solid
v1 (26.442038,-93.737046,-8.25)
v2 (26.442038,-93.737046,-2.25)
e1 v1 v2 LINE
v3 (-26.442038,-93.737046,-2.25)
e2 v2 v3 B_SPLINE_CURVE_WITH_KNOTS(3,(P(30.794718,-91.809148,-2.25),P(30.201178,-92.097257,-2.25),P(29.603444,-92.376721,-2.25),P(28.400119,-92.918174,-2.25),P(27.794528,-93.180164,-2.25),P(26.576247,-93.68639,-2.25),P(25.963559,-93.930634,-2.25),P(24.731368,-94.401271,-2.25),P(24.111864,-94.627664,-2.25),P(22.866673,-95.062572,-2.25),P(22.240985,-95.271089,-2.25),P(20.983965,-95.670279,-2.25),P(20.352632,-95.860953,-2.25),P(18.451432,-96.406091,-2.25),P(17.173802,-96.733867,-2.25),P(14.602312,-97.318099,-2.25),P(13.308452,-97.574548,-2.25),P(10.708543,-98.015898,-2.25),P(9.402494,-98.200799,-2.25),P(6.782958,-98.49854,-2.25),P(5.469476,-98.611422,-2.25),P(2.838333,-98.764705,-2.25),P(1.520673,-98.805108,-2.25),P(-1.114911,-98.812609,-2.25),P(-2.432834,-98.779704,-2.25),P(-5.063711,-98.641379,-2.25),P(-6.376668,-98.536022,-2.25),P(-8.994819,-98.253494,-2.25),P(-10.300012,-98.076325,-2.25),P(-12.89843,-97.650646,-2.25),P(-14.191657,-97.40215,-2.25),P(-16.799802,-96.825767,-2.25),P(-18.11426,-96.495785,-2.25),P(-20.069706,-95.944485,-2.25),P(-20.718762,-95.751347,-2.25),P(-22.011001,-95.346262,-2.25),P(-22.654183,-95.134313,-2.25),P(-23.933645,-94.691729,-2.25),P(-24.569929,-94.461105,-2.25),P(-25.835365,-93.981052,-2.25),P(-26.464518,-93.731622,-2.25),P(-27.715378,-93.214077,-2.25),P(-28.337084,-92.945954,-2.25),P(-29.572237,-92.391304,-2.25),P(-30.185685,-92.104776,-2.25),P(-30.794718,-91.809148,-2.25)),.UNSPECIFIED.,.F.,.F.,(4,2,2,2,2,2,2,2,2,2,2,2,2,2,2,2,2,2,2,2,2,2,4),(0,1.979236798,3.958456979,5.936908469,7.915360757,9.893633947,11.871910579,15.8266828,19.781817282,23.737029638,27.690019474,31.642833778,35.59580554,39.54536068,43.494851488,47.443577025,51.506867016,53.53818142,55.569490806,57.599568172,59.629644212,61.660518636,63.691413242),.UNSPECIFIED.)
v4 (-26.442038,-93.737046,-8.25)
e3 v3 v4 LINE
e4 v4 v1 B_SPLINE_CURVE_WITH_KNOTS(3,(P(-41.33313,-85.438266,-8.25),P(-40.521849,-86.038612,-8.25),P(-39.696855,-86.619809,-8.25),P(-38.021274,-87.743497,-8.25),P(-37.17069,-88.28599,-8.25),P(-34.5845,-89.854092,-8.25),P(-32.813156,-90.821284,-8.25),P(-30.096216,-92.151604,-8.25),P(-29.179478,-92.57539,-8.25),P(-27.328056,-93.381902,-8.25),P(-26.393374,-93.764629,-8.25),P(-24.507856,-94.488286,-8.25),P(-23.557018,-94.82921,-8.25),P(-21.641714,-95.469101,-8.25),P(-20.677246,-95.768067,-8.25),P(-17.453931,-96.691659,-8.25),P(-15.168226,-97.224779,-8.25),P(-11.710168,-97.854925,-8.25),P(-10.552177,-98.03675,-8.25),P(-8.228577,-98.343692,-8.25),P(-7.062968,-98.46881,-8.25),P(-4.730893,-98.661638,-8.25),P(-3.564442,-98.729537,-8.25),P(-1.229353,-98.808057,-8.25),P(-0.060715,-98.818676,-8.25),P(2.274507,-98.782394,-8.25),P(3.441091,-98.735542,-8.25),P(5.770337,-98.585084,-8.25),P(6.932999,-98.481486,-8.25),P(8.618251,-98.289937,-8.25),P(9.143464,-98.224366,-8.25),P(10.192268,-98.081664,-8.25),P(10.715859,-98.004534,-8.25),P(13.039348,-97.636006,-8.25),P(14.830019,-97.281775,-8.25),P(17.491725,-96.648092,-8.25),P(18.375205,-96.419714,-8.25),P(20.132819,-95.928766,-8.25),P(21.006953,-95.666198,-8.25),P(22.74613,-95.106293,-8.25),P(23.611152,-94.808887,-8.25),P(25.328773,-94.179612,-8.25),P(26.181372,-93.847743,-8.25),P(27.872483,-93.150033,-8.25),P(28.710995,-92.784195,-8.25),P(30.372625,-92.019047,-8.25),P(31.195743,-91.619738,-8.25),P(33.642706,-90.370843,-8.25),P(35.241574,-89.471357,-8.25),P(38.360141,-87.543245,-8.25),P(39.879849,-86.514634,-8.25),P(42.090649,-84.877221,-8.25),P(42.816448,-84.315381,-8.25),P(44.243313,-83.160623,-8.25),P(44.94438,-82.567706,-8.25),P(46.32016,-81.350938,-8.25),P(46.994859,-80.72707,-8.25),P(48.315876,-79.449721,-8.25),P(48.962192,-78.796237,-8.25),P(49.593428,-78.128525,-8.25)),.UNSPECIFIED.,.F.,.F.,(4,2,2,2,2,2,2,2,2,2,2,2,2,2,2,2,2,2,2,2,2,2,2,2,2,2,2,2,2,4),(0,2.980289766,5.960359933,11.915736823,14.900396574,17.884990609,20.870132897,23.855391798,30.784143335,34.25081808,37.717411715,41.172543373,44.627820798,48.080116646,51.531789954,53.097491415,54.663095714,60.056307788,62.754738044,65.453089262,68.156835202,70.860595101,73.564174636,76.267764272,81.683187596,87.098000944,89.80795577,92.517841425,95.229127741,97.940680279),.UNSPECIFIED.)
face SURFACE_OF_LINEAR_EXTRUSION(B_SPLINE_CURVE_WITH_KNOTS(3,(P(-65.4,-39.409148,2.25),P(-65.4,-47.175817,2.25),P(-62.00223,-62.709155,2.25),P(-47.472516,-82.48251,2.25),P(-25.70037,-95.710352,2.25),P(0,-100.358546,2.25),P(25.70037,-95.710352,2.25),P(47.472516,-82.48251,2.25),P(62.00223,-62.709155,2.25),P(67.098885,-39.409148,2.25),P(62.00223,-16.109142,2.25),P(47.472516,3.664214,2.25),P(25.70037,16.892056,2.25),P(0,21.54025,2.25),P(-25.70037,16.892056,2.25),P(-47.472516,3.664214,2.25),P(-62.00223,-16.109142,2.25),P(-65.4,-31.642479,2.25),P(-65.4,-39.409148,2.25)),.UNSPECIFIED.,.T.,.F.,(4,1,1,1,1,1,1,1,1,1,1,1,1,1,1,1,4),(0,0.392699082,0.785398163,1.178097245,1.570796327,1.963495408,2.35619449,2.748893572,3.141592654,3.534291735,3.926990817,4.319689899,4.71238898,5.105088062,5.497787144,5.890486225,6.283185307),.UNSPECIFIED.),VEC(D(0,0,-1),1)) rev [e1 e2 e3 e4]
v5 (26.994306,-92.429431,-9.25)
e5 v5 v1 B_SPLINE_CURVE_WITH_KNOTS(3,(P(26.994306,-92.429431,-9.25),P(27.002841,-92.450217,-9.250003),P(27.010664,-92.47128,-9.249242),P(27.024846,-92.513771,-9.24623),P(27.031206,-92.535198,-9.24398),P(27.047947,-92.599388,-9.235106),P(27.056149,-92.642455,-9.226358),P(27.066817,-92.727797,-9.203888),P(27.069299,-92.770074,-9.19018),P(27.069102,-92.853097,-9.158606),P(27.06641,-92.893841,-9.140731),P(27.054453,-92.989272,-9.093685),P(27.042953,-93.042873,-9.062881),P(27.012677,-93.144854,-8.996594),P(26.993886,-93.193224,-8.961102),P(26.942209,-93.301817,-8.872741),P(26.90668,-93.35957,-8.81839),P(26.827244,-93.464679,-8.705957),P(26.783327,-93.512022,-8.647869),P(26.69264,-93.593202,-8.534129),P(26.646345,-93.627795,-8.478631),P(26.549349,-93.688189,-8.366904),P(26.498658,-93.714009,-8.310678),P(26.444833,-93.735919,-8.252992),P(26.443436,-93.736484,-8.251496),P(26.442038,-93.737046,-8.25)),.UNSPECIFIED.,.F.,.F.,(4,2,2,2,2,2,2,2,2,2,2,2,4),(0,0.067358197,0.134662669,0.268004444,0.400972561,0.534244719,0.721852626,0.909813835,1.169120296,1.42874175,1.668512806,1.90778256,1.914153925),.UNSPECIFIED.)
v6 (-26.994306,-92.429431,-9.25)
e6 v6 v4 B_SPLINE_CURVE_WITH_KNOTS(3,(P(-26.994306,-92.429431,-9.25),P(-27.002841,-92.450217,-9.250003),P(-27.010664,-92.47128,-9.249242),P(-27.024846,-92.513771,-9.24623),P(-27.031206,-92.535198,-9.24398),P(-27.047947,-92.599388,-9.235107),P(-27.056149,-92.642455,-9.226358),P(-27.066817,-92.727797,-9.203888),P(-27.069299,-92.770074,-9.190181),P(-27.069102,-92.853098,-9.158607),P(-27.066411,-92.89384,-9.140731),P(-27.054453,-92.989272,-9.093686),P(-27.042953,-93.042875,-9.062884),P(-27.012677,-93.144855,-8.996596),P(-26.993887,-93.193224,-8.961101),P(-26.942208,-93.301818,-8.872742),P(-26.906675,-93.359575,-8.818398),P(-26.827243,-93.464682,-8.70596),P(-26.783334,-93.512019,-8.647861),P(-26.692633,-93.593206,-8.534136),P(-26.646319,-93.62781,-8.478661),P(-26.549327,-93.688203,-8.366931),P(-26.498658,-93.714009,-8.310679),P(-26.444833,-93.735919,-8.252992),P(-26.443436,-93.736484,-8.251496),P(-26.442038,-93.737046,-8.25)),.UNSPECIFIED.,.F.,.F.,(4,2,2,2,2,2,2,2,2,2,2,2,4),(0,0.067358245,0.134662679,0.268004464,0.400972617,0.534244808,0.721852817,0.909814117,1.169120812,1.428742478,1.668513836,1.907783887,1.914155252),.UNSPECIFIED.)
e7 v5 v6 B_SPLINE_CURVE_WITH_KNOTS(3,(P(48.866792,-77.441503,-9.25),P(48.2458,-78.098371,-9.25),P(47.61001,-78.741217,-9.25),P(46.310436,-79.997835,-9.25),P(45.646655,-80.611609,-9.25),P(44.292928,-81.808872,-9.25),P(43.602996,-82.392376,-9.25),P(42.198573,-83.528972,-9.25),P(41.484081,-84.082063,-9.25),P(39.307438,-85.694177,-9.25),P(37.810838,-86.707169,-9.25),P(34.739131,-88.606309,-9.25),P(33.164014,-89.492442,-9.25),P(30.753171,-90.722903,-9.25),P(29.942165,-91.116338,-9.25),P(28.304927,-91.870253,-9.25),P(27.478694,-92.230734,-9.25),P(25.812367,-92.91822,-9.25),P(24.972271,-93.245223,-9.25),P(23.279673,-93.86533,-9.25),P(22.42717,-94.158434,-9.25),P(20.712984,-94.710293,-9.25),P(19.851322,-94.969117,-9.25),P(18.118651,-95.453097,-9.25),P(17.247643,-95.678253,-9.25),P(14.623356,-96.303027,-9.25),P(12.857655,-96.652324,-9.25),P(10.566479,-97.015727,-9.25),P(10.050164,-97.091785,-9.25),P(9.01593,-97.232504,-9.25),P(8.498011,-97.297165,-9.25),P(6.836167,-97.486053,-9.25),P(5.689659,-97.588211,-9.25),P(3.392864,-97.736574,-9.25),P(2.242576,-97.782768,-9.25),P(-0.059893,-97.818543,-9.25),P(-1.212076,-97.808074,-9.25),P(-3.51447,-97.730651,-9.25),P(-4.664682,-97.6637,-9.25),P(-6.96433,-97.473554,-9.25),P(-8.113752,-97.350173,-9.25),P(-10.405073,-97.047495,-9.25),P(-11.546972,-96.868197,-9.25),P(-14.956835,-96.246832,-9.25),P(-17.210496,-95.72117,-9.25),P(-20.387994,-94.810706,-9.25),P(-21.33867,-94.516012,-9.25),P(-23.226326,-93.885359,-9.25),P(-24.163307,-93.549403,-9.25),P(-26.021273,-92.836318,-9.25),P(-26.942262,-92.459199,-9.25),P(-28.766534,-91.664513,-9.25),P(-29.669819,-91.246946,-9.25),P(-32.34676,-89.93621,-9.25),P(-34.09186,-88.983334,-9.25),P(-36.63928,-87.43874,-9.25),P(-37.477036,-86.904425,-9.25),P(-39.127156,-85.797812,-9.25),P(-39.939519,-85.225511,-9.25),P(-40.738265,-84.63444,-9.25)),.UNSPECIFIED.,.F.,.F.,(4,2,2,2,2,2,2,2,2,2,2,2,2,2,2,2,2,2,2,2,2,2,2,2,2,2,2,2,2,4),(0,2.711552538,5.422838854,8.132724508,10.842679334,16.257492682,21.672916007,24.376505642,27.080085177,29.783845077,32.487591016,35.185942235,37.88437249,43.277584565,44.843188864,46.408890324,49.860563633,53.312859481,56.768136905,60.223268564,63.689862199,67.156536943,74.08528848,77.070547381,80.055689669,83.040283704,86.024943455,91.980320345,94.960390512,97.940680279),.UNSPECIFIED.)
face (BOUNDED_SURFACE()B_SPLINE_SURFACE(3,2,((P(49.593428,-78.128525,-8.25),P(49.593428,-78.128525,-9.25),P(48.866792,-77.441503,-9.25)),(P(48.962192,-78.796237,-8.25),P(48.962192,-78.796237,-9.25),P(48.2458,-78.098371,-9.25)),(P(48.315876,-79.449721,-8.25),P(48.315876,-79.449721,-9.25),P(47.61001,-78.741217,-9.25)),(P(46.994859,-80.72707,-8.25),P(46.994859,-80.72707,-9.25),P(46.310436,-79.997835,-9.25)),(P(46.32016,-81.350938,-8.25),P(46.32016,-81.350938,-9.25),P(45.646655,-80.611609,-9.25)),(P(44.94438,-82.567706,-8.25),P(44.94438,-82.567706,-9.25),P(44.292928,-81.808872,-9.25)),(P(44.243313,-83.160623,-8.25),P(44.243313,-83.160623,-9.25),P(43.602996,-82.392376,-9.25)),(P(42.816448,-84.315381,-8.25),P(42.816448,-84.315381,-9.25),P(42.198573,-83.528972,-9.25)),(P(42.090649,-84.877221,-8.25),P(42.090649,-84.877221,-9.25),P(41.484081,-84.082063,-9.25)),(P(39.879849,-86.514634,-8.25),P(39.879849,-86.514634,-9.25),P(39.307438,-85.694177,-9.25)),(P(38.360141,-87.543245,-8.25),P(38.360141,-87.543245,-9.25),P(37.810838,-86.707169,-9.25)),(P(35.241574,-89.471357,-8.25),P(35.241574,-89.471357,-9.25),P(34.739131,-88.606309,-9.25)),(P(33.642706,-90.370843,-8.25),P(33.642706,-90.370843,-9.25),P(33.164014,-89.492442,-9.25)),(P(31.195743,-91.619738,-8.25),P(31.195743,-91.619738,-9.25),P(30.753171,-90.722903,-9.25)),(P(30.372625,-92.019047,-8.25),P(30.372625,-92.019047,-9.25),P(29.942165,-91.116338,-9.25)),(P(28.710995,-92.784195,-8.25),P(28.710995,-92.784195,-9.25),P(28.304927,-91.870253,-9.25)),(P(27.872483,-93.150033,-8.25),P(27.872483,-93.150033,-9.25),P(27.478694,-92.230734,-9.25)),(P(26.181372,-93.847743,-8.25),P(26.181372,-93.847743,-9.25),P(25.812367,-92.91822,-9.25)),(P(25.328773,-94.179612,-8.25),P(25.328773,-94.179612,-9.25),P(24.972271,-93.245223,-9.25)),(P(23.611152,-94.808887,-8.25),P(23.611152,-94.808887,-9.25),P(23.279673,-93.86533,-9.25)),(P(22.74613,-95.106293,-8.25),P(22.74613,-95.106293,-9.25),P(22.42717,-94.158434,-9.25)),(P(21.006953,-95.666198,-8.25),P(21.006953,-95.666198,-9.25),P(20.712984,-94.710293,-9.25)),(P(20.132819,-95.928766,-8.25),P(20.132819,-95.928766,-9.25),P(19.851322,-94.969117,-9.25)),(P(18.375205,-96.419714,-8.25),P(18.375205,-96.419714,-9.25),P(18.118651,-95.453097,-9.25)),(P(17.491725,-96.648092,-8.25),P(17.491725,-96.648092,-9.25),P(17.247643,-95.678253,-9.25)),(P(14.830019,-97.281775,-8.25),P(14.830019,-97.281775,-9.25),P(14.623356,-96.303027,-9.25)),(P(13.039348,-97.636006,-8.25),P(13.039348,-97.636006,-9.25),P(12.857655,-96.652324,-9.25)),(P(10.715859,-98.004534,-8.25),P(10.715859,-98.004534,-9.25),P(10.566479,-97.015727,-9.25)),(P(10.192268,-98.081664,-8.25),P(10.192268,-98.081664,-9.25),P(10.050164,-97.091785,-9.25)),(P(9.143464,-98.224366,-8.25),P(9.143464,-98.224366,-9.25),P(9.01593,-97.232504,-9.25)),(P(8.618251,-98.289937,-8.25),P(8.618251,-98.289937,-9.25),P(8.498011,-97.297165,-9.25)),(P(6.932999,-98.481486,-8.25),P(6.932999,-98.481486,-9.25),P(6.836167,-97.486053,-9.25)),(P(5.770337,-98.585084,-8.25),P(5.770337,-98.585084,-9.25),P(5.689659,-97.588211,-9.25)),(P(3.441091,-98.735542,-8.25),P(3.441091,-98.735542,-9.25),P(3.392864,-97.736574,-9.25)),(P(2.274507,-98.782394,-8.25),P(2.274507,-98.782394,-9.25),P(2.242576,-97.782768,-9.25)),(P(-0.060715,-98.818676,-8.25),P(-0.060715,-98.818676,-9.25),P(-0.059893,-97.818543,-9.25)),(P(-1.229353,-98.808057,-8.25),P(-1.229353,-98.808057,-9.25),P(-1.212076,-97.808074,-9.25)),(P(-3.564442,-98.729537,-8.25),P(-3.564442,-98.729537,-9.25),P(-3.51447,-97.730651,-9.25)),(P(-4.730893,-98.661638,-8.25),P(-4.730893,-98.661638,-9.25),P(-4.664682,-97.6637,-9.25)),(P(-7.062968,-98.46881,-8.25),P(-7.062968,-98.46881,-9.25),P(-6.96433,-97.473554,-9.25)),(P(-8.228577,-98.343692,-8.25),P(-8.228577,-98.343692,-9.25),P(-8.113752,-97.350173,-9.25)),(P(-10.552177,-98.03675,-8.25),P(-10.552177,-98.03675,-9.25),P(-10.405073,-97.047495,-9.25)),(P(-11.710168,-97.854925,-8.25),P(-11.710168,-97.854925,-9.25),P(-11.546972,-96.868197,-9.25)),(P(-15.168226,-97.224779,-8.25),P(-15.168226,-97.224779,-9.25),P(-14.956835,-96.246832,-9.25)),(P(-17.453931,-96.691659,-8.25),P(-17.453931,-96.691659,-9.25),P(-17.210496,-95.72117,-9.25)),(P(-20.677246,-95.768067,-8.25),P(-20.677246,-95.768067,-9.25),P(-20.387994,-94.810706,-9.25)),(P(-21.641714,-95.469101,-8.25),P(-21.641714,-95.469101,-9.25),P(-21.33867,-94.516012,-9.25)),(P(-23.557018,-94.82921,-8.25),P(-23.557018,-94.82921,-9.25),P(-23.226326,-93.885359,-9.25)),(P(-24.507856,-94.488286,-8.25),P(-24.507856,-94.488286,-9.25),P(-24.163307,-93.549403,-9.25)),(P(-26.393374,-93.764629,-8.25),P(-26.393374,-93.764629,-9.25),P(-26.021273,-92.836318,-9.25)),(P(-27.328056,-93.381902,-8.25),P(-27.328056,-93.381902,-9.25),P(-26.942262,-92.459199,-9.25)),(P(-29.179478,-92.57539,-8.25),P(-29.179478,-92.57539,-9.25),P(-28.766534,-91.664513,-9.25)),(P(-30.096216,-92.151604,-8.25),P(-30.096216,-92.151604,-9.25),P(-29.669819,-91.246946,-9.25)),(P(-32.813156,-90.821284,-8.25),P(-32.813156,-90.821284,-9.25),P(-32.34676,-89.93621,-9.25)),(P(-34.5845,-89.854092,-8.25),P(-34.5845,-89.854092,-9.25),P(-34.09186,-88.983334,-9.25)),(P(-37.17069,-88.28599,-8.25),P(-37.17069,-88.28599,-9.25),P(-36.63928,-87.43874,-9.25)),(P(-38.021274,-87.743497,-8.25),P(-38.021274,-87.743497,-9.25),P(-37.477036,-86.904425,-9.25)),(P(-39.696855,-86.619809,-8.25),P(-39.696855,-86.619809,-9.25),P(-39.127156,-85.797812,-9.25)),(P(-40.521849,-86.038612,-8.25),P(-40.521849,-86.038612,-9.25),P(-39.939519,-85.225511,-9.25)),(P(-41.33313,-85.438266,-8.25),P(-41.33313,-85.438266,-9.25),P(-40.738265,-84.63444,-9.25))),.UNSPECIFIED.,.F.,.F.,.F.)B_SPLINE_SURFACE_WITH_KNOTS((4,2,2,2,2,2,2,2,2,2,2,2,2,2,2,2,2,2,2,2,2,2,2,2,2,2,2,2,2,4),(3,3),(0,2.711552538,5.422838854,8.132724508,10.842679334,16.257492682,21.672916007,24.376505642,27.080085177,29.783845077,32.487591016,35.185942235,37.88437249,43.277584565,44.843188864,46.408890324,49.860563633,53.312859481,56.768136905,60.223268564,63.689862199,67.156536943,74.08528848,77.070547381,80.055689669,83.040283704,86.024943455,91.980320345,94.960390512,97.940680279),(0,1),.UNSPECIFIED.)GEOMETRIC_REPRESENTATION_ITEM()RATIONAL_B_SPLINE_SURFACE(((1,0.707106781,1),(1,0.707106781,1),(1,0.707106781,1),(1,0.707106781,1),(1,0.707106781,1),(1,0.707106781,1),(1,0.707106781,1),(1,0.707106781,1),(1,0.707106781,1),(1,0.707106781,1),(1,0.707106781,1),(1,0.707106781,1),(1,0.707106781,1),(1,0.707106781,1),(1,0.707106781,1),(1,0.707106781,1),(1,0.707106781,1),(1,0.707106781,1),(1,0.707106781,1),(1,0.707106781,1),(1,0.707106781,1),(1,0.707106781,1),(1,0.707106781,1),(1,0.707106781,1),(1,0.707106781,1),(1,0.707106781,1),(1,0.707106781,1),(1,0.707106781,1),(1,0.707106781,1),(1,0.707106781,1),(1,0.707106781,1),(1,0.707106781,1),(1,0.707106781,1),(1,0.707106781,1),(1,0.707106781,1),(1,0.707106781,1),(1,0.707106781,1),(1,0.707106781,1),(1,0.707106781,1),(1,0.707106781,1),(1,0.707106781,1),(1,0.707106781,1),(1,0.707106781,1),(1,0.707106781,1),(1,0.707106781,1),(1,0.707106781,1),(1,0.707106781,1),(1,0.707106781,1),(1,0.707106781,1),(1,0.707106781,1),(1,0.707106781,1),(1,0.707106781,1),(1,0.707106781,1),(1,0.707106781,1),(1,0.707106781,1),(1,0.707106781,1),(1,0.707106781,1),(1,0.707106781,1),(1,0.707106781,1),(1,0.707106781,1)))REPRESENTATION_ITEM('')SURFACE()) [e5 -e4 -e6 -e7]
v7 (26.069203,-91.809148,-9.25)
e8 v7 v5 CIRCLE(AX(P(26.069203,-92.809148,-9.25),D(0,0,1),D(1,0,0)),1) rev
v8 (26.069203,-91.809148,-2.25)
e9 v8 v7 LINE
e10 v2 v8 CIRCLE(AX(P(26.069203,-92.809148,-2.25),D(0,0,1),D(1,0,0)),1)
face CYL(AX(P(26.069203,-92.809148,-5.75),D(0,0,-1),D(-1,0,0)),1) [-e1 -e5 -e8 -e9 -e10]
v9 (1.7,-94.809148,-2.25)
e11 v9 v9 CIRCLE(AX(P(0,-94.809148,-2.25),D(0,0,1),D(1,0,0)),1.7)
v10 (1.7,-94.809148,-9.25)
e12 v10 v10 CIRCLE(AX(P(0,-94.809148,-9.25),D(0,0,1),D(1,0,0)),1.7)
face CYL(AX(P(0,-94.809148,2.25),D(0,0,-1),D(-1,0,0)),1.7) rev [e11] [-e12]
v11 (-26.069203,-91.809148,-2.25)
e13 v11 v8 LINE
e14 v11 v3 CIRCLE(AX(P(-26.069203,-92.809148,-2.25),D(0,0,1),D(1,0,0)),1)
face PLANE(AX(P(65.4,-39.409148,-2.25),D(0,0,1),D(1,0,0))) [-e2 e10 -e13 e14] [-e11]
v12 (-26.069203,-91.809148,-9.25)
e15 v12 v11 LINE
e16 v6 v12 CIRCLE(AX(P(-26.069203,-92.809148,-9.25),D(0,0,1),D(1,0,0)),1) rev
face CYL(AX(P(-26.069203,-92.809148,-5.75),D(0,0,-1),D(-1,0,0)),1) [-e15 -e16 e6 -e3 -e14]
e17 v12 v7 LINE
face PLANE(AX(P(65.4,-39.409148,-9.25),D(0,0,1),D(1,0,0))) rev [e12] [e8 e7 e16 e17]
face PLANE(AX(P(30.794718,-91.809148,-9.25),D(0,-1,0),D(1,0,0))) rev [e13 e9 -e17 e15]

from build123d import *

# Parameters (mm, degrees)
EXTRUDE_START            = -2.25
EXTRUDE_2_OUTLINE_R      = 7.6
EXTRUDE_2_DEPTH          = 4.5
FILLET_1_R               = 20
EXTRUDE_6_DEPTH          = 7
FILLET_5_R               = 1
CUT_EXTRUDE_3_DEPTH      = 120.048972165
CUT_EXTRUDE_3_DEPTH_BACK = 120.048972165


# Read off the part's stored shape, not the designer's step: Бобышка-Вытянуть2
with BuildPart() as part:
    # Бобышка-Вытянуть2 outline → Бобышка-Вытянуть2 (new body)
    with BuildSketch(Plane.XY.offset(EXTRUDE_START)):
        with BuildLine():
            add(Edge.make_bspline(
                [(-65.4, -39.40914805), (-65.4, -47.175816893), (-62.002230156, -62.709154577), (-47.47251585, -82.482509686), (-25.700369735, -95.710351943), (0, -100.358546104), (25.700369735, -95.710351943), (47.47251585, -82.482509686), (62.002230156, -62.709154577), (67.098884922, -39.40914805), (62.002230156, -16.109141524), (47.47251585, 3.664213585), (25.700369735, 16.892055843), (0, 21.540250003), (-25.700369735, 16.892055843), (-47.47251585, 3.664213585), (-62.002230156, -16.109141524), (-65.4, -31.642479208), (-65.4, -39.40914805)],
                knots=[0, 0, 0, 0, 0.392699082, 0.785398163, 1.178097245, 1.570796327, 1.963495408, 2.35619449, 2.748893572, 3.141592654, 3.534291735, 3.926990817, 4.319689899, 4.71238898, 5.105088062, 5.497787144, 5.890486225, 6.283185307, 6.283185307, 6.283185307, 6.283185307], degree=3))
        make_face()
        with BuildLine():
            add(Edge.make_bspline(
                [(-50.377711226, -9.40914805), (-50.920216849, -10.147880044), (-53.009488643, -13.148970519), (-58.287053578, -22.675724676), (-60.4, -32.361278425), (-60.4, -39.40914805), (-60.4, -46.457017676), (-57.531501115, -59.605955028), (-48.578428032, -72.525678375), (-42.381106639, -78.200739223), (-40.925271095, -79.40914805)],
                knots=[5.694527978, 5.694527978, 5.694527978, 5.694527978, 5.74351754, 5.890486225, 6.283185307, 6.283185307, 6.283185307, 6.675884389, 7.015828772, 7.114003543, 7.114003543, 7.114003543, 7.114003543], degree=3))
            Line((-50.377711226, -9.40914805), (-12.131830741, -18.974848484))
            ThreePointArc((-12.131830741, -18.974848484), (0, -20.468986128), (12.131830741, -18.974848484))
            Line((12.131830741, -18.974848484), (50.373795788, -9.410127343))
            add(Edge.make_bspline(
                [(40.925271095, -79.40914805), (42.381106639, -78.200739223), (48.578428032, -72.525678375), (57.531501115, -59.605955028), (61.937523955, -39.40914805), (58.09524141, -21.796475187), (52.543848483, -12.36529325), (50.373795788, -9.410127343)],
                knots=[2.310774418, 2.310774418, 2.310774418, 2.310774418, 2.408949189, 2.748893572, 3.141592654, 3.534291735, 3.730251177, 3.730251177, 3.730251177, 3.730251177], degree=3))
            Line((40.925271095, -79.40914805), (-40.925271095, -79.40914805))
        make_face(mode=Mode.SUBTRACT)
        with Locations((0, -9.40914805)):
            Circle(EXTRUDE_2_OUTLINE_R, mode=Mode.SUBTRACT)
    extrude(amount=EXTRUDE_2_DEPTH)

    # Скругление1
    fillet_1_edges = [part.edges().sort_by_distance(p)[0] for p in [
        (50.373795788, -9.410127343, 0),
        (-50.377711226, -9.40914805, 0),
        (-40.925271095, -79.40914805, 0),
        (40.925271095, -79.40914805, 0),
    ]]
    fillet(fillet_1_edges, radius=FILLET_1_R)


with BuildPart() as body_2:
    # Эскиз5 → Бобышка-Вытянуть6 (new body)
    with BuildSketch(Plane(origin=(0, 0, -2.25), x_dir=(-1, 0, 0), z_dir=(0, 0, -1))):
        with BuildLine():
            Line((-30.79471813, -91.80914805), (30.79471813, -91.80914805))
            add(Edge.make_bspline(
                [(-30.79471813, -91.80914805), (-28.92410717, -92.717157206), (-19.255000826, -96.876067707), (0, -100.358546104), (19.255000826, -96.876067707), (28.92410717, -92.717157206), (30.79471813, -91.80914805)],
                knots=[4.222444596, 4.222444596, 4.222444596, 4.222444596, 4.319689899, 4.71238898, 5.105088062, 5.202333365, 5.202333365, 5.202333365, 5.202333365], degree=3))
        make_face()
    extrude(amount=EXTRUDE_6_DEPTH)

    # Скругление5
    fillet_5_edges = [body_2.edges().sort_by_distance(p)[0] for p in [
        (0, -98.80914805, -9.25),
        (30.79471813, -91.80914805, -5.75),
        (-30.79471813, -91.80914805, -5.75),
    ]]
    fillet(fillet_5_edges, radius=FILLET_5_R)


with BuildPart() as cut_extrude_3_tool:
    # Эскиз7 → Вырез-Вытянуть3 (new, two sides: drawn at the far end of the back side and taken through both)
    with BuildSketch(Plane(origin=(0, 0, -9.25), x_dir=(-1, 0, 0), z_dir=(0, 0, -1)).offset(-CUT_EXTRUDE_3_DEPTH_BACK)):
        with BuildLine():
            ThreePointArc((1.7, -94.8091481), (1.202081528, -93.607066572), (0, -93.1091481))
            Line((0, -93.1091481), (0, -96.5091481))
            ThreePointArc((0, -96.5091481), (1.202081528, -96.011229629), (1.7, -94.8091481))
        make_face()
        with BuildLine():
            Line((0, -96.5091481), (0, -93.1091481))
            ThreePointArc((0, -93.1091481), (-1.7, -94.8091481), (0, -96.5091481))
        make_face()
    extrude(amount=CUT_EXTRUDE_3_DEPTH + CUT_EXTRUDE_3_DEPTH_BACK)


with BuildPart() as part_1:
    add(part.part)

    # Вырез-Вытянуть3: cut by cut_extrude_3_tool
    add(cut_extrude_3_tool.part, mode=Mode.SUBTRACT)


with BuildPart() as body_2_1:
    add(body_2.part)

    # Вырез-Вытянуть3: cut by cut_extrude_3_tool
    add(cut_extrude_3_tool.part, mode=Mode.SUBTRACT)


solid = body_2_1.part
